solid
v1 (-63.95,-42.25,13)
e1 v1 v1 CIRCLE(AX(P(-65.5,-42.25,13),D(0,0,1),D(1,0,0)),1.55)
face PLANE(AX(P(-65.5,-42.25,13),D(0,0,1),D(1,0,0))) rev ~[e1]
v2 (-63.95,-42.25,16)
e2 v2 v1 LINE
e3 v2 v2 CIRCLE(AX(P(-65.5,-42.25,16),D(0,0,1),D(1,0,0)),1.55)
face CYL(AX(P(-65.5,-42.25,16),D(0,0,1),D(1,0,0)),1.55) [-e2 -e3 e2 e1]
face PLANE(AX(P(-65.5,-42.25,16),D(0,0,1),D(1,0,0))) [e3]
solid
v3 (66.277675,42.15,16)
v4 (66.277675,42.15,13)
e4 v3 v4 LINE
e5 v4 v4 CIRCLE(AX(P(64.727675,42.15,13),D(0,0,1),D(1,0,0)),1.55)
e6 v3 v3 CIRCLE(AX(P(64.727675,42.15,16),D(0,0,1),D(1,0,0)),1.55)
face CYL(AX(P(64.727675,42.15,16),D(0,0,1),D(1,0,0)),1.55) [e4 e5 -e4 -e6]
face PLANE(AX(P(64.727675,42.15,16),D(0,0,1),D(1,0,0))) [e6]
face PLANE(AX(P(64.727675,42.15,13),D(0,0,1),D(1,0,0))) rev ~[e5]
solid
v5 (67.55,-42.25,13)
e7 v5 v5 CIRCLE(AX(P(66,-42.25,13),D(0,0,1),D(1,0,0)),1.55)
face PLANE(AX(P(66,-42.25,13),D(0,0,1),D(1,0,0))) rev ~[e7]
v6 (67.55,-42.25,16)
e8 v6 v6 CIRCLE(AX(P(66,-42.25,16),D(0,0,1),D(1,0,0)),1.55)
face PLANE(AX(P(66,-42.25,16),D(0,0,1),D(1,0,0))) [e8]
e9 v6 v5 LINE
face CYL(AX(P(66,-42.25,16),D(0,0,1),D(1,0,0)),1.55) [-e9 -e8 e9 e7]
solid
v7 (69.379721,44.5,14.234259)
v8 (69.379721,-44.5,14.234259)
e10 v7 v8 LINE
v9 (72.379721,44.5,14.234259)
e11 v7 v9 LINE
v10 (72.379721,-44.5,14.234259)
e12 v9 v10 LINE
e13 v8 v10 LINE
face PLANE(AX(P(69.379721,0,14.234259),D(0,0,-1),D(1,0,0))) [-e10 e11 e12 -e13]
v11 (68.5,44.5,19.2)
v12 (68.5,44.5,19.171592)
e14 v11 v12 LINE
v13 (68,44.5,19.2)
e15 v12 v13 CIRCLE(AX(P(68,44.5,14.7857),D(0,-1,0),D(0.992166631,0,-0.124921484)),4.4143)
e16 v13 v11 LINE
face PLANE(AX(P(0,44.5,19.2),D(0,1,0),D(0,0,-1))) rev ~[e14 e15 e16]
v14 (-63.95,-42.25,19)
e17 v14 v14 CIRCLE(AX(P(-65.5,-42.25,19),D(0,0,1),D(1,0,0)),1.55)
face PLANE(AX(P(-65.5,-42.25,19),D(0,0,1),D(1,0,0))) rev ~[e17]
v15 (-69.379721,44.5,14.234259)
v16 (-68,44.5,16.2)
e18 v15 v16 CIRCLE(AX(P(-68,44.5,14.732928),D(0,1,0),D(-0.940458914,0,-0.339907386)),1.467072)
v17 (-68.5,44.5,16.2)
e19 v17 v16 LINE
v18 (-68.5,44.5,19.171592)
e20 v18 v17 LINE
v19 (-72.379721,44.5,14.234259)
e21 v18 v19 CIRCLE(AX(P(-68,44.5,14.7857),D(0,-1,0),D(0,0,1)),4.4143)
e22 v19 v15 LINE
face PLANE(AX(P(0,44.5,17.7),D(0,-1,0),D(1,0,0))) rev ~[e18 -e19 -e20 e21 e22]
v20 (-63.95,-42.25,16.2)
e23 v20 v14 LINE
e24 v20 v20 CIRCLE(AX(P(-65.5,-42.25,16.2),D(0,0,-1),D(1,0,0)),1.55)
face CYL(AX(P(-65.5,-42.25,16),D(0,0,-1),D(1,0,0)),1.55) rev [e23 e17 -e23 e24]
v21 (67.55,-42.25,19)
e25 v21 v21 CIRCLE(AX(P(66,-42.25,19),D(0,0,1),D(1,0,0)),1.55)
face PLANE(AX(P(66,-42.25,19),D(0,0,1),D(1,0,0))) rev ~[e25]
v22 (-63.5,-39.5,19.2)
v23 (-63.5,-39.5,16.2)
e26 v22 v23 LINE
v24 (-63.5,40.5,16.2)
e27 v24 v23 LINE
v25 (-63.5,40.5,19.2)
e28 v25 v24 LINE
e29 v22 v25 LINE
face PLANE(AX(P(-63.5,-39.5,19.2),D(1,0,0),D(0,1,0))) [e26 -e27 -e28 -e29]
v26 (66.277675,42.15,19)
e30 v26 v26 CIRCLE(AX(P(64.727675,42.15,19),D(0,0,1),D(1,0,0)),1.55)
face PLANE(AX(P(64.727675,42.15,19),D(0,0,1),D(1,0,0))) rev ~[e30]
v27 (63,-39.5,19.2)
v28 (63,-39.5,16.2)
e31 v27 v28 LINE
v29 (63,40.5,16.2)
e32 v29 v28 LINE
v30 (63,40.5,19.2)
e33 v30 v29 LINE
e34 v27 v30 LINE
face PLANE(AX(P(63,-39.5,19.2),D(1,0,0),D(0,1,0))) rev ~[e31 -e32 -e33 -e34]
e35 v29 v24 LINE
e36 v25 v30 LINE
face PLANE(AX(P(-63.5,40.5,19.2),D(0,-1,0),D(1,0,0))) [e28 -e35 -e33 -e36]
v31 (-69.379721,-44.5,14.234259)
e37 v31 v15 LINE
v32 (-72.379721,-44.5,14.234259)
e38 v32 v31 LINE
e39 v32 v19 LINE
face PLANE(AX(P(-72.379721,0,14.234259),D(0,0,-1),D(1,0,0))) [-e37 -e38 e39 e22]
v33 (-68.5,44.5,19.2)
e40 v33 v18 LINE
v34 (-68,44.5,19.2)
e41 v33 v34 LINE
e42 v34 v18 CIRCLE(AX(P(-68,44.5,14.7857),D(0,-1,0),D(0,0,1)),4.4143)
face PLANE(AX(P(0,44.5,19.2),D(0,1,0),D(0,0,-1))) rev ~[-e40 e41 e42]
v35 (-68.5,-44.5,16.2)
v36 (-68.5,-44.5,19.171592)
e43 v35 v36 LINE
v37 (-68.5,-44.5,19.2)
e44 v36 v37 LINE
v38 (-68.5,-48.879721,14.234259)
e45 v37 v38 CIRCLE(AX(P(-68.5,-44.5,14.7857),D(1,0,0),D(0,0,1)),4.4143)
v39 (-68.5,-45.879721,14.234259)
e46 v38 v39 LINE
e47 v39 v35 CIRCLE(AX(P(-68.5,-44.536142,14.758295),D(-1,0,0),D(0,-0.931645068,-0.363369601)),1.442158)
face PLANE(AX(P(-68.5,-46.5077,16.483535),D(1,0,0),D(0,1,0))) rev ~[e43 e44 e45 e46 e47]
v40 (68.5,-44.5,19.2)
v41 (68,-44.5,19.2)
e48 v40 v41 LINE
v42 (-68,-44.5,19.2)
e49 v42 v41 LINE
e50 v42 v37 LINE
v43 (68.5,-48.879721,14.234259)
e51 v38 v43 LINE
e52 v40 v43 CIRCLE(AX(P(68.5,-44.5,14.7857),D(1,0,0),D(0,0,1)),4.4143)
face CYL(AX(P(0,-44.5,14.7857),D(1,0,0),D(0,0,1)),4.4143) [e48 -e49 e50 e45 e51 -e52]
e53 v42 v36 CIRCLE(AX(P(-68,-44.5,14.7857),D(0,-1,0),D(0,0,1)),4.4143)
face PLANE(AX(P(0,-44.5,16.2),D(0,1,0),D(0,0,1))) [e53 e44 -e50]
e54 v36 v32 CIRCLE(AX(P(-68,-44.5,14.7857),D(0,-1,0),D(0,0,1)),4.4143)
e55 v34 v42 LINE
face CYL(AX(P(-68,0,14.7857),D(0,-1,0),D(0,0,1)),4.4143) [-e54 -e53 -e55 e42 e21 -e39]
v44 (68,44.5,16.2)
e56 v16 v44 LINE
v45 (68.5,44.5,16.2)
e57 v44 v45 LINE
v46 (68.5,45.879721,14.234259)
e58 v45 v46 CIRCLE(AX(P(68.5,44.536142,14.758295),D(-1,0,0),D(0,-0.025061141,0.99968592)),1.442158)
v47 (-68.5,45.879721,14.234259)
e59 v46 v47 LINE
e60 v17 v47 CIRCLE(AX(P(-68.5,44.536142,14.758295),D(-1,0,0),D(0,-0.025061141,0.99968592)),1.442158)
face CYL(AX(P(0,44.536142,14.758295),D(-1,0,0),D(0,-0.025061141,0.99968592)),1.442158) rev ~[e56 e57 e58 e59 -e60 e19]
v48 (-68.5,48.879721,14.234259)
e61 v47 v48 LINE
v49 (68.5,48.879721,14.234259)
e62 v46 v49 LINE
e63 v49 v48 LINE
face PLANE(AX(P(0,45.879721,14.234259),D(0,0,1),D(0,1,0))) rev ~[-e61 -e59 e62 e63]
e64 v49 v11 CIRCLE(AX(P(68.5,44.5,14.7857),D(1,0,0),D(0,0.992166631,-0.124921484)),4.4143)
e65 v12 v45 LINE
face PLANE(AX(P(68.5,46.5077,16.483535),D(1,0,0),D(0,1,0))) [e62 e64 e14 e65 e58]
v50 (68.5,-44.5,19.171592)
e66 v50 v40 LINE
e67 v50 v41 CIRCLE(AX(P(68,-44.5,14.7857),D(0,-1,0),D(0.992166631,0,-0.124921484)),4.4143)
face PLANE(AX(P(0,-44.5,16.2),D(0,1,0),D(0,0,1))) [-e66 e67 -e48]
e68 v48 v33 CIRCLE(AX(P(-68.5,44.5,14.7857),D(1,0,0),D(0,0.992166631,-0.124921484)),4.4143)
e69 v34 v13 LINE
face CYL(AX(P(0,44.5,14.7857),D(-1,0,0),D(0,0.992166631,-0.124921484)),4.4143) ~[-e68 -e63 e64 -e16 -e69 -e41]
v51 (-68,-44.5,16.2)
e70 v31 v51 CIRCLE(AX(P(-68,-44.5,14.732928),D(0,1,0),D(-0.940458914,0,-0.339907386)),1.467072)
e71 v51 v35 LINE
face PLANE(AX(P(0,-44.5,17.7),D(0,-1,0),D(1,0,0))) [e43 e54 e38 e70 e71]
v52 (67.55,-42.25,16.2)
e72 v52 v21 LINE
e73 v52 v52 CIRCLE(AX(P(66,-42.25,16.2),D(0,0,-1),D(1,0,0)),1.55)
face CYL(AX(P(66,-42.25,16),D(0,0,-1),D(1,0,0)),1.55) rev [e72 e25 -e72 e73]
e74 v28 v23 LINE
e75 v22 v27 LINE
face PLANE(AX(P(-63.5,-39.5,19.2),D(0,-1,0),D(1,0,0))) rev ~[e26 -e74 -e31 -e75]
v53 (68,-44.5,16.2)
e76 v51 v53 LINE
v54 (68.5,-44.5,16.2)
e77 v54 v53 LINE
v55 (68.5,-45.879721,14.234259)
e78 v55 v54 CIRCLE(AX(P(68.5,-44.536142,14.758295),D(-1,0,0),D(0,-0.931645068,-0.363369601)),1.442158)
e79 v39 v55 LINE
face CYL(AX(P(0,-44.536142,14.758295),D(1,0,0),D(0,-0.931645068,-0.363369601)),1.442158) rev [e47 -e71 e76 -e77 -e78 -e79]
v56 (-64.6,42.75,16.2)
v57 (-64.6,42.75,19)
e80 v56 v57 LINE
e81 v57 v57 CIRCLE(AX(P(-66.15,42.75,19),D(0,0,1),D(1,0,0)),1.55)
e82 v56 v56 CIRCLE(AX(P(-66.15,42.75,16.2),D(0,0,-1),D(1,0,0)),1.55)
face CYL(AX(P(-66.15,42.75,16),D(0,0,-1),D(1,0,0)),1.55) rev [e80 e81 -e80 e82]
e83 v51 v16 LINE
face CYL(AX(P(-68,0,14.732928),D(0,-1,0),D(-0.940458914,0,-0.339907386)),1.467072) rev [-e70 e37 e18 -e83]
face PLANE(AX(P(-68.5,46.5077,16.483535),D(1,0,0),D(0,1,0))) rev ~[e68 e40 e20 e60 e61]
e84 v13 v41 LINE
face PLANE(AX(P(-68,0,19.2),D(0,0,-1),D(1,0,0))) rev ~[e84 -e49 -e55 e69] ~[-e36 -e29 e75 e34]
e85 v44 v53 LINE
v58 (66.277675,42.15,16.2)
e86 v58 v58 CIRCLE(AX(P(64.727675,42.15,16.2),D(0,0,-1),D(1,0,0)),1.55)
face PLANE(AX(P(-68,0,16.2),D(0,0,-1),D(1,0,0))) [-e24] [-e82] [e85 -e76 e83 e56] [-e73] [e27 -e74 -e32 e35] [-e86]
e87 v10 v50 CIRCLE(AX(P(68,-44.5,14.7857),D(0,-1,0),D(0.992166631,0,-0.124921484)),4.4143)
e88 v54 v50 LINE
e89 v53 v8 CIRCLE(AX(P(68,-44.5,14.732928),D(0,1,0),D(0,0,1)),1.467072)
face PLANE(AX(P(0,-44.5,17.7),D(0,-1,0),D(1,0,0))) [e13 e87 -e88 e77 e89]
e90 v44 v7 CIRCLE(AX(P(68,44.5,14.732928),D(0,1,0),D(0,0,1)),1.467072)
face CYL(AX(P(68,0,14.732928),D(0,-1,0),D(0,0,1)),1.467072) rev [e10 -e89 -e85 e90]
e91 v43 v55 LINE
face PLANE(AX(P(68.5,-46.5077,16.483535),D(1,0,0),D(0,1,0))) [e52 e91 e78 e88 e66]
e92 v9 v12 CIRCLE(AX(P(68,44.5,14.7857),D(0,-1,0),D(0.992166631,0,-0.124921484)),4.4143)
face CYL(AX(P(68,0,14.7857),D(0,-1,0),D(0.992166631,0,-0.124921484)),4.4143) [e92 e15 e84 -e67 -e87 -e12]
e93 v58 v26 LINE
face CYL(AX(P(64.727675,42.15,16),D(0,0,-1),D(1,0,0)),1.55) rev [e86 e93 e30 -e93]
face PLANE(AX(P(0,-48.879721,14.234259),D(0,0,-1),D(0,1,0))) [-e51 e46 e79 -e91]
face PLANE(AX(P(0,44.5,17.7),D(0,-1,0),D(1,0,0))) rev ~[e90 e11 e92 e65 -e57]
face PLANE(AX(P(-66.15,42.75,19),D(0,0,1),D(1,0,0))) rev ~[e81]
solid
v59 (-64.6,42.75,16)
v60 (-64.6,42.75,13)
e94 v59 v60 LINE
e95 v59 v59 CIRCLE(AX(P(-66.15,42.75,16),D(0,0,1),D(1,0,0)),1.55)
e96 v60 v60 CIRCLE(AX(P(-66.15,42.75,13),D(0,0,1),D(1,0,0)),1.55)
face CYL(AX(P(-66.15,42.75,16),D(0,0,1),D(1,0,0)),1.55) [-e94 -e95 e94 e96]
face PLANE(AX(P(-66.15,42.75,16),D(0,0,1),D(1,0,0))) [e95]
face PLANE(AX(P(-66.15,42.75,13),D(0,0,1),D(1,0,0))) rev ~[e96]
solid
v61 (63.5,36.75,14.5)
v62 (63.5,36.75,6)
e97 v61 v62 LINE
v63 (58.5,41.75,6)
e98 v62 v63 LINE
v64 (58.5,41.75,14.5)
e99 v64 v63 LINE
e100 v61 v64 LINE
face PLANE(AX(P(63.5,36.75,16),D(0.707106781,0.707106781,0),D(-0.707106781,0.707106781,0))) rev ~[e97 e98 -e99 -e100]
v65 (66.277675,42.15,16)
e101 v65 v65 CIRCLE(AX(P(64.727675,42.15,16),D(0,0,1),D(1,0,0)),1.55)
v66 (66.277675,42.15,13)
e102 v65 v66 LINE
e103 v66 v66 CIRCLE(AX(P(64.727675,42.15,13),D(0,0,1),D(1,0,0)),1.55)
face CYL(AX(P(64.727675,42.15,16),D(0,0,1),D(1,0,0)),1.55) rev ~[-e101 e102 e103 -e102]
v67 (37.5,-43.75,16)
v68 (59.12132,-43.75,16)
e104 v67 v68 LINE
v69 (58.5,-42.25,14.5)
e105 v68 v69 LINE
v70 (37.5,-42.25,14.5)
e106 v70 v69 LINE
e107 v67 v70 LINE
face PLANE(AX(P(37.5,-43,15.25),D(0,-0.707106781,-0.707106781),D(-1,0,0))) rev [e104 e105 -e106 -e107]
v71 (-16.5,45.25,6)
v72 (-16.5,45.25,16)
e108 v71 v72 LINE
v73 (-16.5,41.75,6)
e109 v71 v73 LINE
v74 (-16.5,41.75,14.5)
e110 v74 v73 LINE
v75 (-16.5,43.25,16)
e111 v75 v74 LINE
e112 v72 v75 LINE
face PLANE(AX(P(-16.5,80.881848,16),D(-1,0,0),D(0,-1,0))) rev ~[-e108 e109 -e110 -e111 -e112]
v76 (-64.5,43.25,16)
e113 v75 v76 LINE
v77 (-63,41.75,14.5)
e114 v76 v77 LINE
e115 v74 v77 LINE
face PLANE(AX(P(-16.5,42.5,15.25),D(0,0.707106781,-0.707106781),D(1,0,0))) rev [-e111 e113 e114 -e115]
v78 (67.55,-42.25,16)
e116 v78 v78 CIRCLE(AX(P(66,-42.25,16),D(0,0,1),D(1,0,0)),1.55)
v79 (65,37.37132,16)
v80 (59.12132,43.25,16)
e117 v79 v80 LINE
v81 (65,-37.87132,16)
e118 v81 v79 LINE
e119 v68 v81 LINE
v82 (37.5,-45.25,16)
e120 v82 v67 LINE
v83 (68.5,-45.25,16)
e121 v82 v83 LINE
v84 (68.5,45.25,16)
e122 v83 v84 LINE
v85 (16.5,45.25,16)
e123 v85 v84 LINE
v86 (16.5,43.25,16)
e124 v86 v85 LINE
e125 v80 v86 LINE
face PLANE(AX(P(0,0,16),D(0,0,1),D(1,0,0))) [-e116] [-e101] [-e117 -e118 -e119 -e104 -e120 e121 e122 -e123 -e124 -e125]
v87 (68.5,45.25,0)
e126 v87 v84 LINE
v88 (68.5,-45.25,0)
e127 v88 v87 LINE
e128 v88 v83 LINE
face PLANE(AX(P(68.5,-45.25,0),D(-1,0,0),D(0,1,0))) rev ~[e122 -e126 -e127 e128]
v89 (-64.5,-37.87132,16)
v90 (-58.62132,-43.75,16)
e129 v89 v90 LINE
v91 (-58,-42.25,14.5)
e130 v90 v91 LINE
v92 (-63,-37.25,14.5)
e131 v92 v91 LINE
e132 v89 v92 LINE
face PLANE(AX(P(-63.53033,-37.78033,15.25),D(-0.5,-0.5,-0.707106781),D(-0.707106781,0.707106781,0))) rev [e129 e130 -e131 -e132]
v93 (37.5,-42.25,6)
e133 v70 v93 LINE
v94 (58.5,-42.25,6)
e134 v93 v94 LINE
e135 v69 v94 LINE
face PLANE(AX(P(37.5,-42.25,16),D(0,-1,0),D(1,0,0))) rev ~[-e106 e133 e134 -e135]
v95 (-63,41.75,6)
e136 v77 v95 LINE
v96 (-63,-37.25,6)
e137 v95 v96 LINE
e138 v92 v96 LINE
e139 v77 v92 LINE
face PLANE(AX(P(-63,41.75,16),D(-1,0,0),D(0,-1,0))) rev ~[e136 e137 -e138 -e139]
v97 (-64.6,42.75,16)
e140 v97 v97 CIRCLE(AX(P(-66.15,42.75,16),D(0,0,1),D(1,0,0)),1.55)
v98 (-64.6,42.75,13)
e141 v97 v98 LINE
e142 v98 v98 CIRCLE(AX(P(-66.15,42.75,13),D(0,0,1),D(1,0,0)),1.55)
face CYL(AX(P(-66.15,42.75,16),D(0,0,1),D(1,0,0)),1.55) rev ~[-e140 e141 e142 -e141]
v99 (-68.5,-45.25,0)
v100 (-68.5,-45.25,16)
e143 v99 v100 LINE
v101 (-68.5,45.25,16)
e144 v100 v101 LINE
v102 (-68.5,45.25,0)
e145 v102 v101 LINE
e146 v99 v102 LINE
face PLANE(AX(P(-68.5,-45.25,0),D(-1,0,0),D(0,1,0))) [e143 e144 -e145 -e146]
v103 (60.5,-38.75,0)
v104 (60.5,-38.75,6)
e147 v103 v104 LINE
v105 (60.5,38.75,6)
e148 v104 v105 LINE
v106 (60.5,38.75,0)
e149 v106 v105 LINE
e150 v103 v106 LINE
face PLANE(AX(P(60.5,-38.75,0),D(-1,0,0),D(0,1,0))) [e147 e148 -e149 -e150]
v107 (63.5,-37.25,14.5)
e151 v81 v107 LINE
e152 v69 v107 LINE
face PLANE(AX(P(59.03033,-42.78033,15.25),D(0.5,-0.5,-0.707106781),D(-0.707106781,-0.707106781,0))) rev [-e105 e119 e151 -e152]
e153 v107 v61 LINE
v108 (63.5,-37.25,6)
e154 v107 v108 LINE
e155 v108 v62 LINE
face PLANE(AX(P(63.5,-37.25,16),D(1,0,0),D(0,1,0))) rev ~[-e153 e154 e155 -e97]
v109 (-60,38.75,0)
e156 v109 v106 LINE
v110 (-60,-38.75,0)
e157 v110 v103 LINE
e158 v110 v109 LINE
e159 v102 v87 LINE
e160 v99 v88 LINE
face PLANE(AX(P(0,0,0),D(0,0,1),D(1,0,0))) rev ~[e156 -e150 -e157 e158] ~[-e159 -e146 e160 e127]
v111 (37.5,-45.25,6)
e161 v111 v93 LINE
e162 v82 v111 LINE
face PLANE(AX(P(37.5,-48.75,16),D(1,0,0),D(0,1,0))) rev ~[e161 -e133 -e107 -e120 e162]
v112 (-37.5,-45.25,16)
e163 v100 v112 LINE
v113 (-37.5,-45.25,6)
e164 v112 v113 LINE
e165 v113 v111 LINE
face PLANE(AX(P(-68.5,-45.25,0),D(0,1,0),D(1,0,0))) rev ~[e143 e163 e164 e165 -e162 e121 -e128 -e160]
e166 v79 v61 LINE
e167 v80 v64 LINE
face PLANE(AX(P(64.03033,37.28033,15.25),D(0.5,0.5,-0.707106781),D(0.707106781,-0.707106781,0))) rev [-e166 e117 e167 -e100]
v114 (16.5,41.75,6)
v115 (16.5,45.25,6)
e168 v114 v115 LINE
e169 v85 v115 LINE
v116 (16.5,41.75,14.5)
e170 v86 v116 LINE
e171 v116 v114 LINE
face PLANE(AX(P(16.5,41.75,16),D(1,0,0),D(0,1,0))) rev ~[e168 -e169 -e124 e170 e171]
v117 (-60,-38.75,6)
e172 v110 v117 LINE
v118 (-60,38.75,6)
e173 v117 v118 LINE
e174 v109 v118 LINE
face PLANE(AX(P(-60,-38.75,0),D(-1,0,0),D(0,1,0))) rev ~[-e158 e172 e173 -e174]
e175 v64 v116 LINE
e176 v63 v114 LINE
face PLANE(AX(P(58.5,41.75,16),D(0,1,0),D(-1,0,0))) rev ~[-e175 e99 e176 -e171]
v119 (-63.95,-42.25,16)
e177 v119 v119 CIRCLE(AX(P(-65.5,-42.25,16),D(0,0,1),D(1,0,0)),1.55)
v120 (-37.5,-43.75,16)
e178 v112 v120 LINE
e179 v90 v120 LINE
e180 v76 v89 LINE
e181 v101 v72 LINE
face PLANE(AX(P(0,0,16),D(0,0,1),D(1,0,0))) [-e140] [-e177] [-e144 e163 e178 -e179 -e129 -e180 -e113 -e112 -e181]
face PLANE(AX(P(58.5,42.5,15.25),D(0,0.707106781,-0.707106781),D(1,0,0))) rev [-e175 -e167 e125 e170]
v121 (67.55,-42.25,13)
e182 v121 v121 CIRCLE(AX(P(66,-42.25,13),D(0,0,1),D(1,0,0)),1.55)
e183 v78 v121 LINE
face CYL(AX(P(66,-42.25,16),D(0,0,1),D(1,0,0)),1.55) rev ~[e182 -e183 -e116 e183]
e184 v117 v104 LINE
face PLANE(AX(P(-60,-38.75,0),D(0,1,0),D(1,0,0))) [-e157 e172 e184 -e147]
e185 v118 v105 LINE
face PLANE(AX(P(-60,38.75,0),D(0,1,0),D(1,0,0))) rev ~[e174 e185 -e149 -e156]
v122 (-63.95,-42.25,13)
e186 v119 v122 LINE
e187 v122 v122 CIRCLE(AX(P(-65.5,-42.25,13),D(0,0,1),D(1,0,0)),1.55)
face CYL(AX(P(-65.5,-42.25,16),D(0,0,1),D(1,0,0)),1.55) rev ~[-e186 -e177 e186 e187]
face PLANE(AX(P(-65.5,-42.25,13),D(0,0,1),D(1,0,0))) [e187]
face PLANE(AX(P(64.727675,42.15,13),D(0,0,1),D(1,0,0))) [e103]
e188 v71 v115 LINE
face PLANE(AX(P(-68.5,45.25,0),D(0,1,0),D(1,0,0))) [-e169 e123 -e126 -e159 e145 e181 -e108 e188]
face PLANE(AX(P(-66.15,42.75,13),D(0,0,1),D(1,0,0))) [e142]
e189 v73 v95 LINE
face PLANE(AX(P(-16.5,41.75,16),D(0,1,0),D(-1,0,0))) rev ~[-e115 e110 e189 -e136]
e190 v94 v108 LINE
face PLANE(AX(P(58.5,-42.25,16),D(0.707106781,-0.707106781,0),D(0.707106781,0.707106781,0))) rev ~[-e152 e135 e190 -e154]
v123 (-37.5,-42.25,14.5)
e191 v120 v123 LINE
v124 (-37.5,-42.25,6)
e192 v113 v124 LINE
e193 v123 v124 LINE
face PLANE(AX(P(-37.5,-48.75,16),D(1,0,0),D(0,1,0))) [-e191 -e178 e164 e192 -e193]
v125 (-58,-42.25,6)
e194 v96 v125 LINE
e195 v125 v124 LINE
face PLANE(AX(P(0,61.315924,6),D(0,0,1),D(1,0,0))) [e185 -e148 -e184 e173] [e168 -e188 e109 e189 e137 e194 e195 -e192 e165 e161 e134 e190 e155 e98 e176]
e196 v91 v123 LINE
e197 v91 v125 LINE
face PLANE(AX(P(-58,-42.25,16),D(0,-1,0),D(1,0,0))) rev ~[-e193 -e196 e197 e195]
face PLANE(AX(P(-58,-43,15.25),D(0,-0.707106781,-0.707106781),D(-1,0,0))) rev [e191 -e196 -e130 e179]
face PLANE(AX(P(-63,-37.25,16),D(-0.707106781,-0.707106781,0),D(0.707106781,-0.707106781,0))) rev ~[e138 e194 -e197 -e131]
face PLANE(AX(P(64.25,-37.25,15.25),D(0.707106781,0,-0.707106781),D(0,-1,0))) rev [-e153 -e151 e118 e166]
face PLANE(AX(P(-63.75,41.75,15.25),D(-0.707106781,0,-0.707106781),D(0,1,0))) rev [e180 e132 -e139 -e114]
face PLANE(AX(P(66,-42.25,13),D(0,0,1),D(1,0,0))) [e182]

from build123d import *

# Parameters (mm, degrees)
F0_W      = 137
F0_H      = 90.5
F0_W_2    = 120.5
F0_H_2    = 77.5
F1_DEPTH  = 16
F3_W      = 33
F3_H      = 39.131847919
F3_H_2    = 13
F3_W_2    = 75
F3_H_3    = 13.5
F3_H_4    = 6.5
F4_DEPTH  = 10
F5_SIZE   = 1.5
F6_R      = 1.55
F7_DEPTH  = 3
F8_DEPTH  = 3
F9_W      = 136
F9_H      = 3
F10_DEPTH = 44.5
F12_DEPTH = 68.5
F13_W     = 126.5
F13_H     = 80
F14_DEPTH = 10
F15_DEPTH = 3


# Not quite as in the source:
# - a feature names something its author has since deleted; it is built from what else it names


with BuildPart() as f1:
    # F0 (on Top) → F1 (new body)
    with BuildSketch(Plane.XY):
        Rectangle(F0_W, F0_H)
        with Locations((0.25, 0)):
            Rectangle(F0_W_2, F0_H_2, mode=Mode.SUBTRACT)
    extrude(amount=F1_DEPTH)

    # F3 (on 3pt) → F4 (cut)
    with BuildSketch(Plane.XY.offset(16)):
        with Locations((0, 61.3159239595)):
            Rectangle(F3_W, F3_H)
        with Locations((0, 35.25)):
            Rectangle(F3_W, F3_H_2)
        Polygon((-16.5, 28.75), (-16.5, 41.75), (-63, 41.75), (-63, -37.25), (-58, -42.25), (-37.5, -42.25), (-37.5, -28.75), (37.5, -28.75), (37.5, -42.25), (58.5, -42.25), (63.5, -37.25), (63.5, 36.75), (58.5, 41.75), (16.5, 41.75), (16.5, 28.75), align=None)
        with Locations((0, -35.5)):
            Rectangle(F3_W_2, F3_H_3)
        with Locations((0, -45.5)):
            Rectangle(F3_W_2, F3_H_4)
    extrude(amount=-F4_DEPTH, mode=Mode.SUBTRACT)

    # F5
    f5_edges = [f1.edges().sort_by_distance(p)[0] for p in [
        (-63, 2.25, 16),
        (-39.75, 41.75, 16),
        (61, 39.25, 16),
        (63.5, -0.25, 16),
        (61, -39.75, 16),
        (-60.5, -39.75, 16),
        (-47.75, -42.25, 16),
        (48, -42.25, 16),
        (37.5, 41.75, 16),
    ]]
    chamfer(f5_edges, length=F5_SIZE)

    # F6 (on face) → F7 (cut)
    with BuildSketch(Plane.XY.offset(16)):
        with Locations((-66.15, 42.75)):
            Circle(F6_R)
        with Locations((-65.5, -42.25)):
            Circle(F6_R)
        with Locations((66, -42.25)):
            Circle(F6_R)
        with Locations((64.7276754423, 42.15)):
            Circle(F6_R)
    extrude(amount=-F7_DEPTH, mode=Mode.SUBTRACT)


with BuildPart() as f8:
    # F6 (on face) → F8 (new body)
    with BuildSketch(Plane.XY.offset(16)):
        with Locations((-66.15, 42.75)):
            Circle(F6_R)
    extrude(amount=-F8_DEPTH)


with BuildPart() as f8b:
    # F6 (on face) → F8, piece 2 (new body)
    with BuildSketch(Plane.XY.offset(16)):
        with Locations((-65.5, -42.25)):
            Circle(F6_R)
    extrude(amount=-F8_DEPTH)


with BuildPart() as f8c:
    # F6 (on face) → F8, piece 3 (new body)
    with BuildSketch(Plane.XY.offset(16)):
        with Locations((66, -42.25)):
            Circle(F6_R)
    extrude(amount=-F8_DEPTH)


with BuildPart() as f8d:
    # F6 (on face) → F8, piece 4 (new body)
    with BuildSketch(Plane.XY.offset(16)):
        with Locations((64.7276754423, 42.15)):
            Circle(F6_R)
    extrude(amount=-F8_DEPTH)


with BuildPart() as f10:
    # F9 (on Front) → F10 (new body, symmetric)
    with BuildSketch(Plane.XZ):
        with Locations((0, 17.7)):
            Rectangle(F9_W, F9_H)
        with BuildLine():
            Line((-68, 16.2), (-68, 19.2))
            ThreePointArc((-68, 19.2), (-71.3106094408, 17.7056160116), (-72.3797211221, 14.2342591319))
            Line((-72.3797211221, 14.2342591319), (-69.3797211221, 14.2342591319))
            ThreePointArc((-69.3797211221, 14.2342591319), (-69.2008088457, 15.575755747), (-68, 16.2))
        make_face()
        with BuildLine():
            ThreePointArc((72.3797211221, 14.2342591319), (71.3106094408, 17.7056160116), (68, 19.2))
            Line((68, 19.2), (68, 16.2))
            ThreePointArc((68, 16.2), (69.2008088457, 15.575755747), (69.3797211221, 14.2342591319))
            Line((69.3797211221, 14.2342591319), (72.3797211221, 14.2342591319))
        make_face()
    extrude(amount=F10_DEPTH, both=True)

    # F11 (on Right) → F12 (join, symmetric)
    with BuildSketch(Plane.YZ):
        with BuildLine():
            ThreePointArc((48.8797211221, 14.2342591319), (47.8106094408, 17.7056160116), (44.5, 19.2))
            Line((44.5, 19.2), (44.5, 16.2))
            ThreePointArc((44.5, 16.2), (45.7165581841, 15.5868099481), (45.8797211221, 14.2342591319))
            Line((45.8797211221, 14.2342591319), (48.8797211221, 14.2342591319))
        make_face()
        with BuildLine():
            ThreePointArc((-44.5, 19.2), (-47.8106094408, 17.7056160116), (-48.8797211221, 14.2342591319))
            Line((-48.8797211221, 14.2342591319), (-45.8797211221, 14.2342591319))
            ThreePointArc((-45.8797211221, 14.2342591319), (-45.7165581841, 15.5868099481), (-44.5, 16.2))
            Line((-44.5, 16.2), (-44.5, 19.2))
        make_face()
    extrude(amount=F12_DEPTH, both=True)

    # F13 (on face) → F14 (cut)
    with BuildSketch(Plane.XY.offset(19.2)):
        with Locations((-0.25, 0.5)):
            Rectangle(F13_W, F13_H)
    extrude(amount=-F14_DEPTH, mode=Mode.SUBTRACT)

    # F6 (on face) → F15 (cut)
    with BuildSketch(Plane.XY.offset(16)):
        with Locations((-66.15, 42.75)):
            Circle(F6_R)
        with Locations((-65.5, -42.25)):
            Circle(F6_R)
        with Locations((66, -42.25)):
            Circle(F6_R)
        with Locations((64.7276754423, 42.15)):
            Circle(F6_R)
    extrude(amount=F15_DEPTH, mode=Mode.SUBTRACT)


solid = Compound([f1.part, f8.part, f8b.part, f8c.part, f8d.part, f10.part])
